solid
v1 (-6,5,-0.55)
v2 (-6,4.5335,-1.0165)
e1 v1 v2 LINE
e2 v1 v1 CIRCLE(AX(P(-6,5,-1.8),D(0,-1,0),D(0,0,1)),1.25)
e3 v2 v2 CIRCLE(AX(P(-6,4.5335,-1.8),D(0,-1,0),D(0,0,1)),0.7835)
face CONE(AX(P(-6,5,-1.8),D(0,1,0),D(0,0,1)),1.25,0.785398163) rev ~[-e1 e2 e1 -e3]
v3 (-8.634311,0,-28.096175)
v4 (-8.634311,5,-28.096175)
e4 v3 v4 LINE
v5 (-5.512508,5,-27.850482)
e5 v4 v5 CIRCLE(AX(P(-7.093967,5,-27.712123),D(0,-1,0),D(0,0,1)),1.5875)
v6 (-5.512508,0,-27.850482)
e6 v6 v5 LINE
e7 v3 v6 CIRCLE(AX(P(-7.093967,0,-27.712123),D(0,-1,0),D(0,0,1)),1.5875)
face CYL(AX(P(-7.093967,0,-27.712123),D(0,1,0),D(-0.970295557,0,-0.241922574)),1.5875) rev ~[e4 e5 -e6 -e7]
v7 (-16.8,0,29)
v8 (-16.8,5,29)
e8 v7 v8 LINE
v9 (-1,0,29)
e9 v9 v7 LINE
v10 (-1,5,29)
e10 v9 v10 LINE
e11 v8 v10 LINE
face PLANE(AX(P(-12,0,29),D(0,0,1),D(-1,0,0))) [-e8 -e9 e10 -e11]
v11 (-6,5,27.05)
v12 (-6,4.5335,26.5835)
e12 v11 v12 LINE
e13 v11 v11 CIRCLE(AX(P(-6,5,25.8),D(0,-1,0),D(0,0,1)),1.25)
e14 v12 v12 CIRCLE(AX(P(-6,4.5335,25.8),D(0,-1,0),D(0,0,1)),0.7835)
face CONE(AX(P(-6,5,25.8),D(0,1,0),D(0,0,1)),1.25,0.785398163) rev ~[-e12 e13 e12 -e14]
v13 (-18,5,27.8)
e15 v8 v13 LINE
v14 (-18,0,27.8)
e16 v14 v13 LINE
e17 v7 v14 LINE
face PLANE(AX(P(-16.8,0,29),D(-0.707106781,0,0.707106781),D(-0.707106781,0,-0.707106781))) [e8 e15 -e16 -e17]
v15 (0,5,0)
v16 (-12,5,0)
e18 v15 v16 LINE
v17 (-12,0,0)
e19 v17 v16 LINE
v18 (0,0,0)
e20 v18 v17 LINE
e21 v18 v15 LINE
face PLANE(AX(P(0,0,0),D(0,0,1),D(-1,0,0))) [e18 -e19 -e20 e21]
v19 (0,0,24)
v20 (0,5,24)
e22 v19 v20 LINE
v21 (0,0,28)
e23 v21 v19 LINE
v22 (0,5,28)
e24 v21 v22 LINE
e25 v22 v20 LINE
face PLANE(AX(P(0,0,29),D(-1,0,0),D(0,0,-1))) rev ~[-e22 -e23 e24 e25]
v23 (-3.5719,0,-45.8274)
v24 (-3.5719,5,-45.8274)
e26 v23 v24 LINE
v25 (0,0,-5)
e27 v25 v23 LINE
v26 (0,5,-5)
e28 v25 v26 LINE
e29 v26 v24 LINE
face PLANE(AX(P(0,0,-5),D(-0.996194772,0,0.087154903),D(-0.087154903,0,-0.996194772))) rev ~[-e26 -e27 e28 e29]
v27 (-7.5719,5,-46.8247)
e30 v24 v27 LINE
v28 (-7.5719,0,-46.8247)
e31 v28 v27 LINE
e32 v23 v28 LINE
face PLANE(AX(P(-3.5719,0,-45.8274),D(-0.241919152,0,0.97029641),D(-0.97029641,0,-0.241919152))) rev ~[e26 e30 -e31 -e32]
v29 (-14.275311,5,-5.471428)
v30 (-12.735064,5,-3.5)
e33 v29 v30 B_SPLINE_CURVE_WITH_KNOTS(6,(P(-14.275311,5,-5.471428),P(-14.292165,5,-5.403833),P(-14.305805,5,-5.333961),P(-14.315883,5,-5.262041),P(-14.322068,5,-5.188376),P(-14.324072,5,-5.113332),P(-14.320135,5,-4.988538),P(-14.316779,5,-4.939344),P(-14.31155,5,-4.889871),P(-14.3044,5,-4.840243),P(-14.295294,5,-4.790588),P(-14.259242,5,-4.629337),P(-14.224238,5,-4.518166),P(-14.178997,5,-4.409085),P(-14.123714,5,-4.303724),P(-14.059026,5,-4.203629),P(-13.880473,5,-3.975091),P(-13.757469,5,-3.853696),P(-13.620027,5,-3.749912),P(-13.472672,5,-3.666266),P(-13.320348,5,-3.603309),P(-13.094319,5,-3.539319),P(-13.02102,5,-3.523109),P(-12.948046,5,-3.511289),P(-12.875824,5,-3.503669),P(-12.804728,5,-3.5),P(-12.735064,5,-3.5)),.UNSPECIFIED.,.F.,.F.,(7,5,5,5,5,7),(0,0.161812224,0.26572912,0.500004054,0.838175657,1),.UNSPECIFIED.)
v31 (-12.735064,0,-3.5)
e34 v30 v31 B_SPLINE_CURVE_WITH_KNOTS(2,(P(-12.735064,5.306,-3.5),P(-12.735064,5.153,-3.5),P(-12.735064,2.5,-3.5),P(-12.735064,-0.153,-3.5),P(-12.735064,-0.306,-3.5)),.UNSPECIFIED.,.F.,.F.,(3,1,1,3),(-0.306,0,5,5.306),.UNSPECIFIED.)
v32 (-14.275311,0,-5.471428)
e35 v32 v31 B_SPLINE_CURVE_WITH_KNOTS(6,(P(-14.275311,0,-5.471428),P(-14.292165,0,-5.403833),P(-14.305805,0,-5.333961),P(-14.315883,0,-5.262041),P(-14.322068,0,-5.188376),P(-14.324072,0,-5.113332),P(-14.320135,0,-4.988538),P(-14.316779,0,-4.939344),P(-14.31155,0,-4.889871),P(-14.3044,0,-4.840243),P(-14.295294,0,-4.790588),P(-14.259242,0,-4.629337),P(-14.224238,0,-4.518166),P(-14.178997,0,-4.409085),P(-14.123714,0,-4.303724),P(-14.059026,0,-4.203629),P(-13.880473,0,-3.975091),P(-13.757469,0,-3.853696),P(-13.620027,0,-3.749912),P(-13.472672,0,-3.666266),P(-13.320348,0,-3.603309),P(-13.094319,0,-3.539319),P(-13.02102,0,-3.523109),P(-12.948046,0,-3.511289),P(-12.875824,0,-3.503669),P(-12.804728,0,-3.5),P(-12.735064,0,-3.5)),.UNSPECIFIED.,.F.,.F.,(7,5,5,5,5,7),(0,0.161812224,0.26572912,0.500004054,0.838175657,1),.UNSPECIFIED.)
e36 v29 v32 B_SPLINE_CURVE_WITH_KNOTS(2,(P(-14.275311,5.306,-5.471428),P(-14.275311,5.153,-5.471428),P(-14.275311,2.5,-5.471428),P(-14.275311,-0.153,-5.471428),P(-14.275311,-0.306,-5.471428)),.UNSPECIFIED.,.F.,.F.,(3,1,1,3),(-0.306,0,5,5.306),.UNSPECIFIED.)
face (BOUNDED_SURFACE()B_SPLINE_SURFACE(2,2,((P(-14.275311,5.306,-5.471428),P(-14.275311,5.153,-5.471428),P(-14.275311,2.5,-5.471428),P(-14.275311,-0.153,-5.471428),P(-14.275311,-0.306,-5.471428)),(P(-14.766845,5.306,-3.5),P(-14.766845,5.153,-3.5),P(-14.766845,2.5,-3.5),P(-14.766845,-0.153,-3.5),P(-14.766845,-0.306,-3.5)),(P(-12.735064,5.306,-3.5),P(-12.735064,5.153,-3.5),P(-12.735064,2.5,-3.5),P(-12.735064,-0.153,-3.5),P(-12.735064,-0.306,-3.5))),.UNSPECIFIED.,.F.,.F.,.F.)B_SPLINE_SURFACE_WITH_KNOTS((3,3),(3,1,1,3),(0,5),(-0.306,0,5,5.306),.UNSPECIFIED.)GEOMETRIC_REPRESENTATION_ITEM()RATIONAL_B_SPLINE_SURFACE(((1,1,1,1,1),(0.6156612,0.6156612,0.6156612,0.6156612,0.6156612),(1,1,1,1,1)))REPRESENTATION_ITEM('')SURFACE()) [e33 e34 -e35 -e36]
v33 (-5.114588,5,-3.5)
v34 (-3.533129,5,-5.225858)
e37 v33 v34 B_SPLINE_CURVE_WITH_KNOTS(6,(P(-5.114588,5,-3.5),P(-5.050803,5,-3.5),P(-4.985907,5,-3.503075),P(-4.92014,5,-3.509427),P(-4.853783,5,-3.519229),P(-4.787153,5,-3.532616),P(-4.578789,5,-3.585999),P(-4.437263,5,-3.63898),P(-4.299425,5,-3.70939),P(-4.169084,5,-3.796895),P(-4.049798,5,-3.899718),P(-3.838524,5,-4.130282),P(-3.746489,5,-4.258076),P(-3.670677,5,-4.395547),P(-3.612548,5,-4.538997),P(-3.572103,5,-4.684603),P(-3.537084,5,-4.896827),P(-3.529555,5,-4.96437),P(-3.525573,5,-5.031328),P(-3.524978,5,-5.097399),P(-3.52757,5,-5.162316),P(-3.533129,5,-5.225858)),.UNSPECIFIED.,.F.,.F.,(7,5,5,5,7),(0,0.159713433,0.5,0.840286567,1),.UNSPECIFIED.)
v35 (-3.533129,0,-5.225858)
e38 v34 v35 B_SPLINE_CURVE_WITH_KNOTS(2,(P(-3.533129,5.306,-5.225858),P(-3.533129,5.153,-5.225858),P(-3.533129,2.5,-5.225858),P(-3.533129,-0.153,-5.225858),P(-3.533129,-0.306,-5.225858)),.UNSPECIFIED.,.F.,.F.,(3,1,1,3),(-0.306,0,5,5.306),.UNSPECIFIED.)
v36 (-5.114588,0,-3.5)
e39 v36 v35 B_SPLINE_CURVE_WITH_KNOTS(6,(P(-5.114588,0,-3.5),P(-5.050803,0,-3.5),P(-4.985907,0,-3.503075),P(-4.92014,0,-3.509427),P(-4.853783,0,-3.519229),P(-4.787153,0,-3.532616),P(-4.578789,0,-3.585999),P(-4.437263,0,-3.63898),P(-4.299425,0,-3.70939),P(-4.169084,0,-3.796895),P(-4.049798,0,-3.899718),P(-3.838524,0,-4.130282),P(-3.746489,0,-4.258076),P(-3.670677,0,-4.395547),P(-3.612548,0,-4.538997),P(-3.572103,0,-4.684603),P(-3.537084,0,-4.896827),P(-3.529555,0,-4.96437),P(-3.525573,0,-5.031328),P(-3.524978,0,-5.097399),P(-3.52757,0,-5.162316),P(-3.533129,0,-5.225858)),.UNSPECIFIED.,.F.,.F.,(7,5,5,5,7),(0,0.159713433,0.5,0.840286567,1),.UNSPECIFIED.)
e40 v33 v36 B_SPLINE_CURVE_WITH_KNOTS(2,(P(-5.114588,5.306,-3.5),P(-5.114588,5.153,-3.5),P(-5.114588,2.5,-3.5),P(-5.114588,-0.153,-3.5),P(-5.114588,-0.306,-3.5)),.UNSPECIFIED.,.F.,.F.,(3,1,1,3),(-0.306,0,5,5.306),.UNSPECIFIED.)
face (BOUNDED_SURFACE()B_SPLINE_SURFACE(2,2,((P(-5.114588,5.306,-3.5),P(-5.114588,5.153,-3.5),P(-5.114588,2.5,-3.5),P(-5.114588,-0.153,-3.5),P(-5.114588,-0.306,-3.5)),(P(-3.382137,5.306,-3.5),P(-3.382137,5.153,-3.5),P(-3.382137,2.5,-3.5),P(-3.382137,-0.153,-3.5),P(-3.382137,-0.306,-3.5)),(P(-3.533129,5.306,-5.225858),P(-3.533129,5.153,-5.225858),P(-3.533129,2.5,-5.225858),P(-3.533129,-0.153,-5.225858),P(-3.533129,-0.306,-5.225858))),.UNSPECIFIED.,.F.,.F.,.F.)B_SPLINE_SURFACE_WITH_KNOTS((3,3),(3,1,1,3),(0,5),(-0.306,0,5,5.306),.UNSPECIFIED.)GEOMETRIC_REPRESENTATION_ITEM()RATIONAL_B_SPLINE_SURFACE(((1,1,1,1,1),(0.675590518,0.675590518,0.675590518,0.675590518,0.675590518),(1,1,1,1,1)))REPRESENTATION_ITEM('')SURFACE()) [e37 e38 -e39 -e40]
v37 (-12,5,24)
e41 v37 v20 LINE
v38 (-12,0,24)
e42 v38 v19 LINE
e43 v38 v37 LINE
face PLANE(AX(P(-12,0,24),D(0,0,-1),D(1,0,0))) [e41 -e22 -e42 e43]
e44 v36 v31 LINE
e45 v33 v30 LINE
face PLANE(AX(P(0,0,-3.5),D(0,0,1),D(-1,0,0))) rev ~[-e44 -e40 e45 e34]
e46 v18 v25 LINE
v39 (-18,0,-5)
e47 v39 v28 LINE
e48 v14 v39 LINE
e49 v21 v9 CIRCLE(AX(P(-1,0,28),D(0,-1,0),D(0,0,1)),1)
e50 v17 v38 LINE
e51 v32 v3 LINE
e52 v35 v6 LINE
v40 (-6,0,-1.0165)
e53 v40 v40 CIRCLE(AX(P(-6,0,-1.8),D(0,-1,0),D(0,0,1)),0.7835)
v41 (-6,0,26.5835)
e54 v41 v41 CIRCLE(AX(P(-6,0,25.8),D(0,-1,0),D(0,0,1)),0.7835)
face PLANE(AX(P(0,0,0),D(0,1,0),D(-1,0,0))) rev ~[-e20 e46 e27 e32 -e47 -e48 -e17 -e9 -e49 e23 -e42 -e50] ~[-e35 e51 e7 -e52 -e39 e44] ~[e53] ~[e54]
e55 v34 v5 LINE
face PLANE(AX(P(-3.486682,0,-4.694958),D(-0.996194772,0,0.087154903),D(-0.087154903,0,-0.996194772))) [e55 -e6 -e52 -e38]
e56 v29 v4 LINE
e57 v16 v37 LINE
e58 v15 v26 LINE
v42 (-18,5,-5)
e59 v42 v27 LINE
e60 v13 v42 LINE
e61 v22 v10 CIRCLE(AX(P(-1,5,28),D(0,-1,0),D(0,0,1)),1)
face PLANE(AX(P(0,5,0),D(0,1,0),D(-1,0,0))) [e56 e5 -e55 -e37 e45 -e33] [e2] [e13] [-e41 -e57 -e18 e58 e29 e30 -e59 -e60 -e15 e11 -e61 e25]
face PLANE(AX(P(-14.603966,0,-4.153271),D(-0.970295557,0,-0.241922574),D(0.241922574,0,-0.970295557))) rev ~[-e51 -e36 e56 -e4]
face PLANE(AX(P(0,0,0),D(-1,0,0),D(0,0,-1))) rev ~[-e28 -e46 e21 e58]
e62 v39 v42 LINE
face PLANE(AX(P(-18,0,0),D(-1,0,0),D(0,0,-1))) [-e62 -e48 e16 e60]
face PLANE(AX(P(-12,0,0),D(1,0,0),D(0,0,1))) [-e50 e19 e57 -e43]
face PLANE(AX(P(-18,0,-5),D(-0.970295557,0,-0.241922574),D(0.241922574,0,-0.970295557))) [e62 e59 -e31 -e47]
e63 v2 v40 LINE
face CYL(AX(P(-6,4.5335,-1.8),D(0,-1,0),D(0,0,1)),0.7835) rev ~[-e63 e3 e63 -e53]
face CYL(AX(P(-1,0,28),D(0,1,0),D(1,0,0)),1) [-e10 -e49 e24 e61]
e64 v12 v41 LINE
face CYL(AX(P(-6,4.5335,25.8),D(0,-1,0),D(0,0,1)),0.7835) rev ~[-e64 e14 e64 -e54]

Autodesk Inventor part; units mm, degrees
ref_plane "YZ Plane" through (0, 0, 0) normal (1, 0, 0) x (0, 1, 0)
ref_plane "XZ Plane" through (0, 0, 0) normal (0, 1, 0) x (-1, 0, 0)
ref_plane "XY Plane" through (0, 0, 0) normal (0, 0, 1) x (1, 0, 0)
sketch "Sketch1" plane through (0, 0, 0) normal (0, 1, 0) x (-1, 0, 0)
  line L0 (0, 0) -> (18, 0)
  line L1 (0, 0) -> (0, -5)
  line L2 (0, -5) -> (3.5719, -45.8274)
  line L3 (18, 0) -> (18, -5)
  line L4 (18, -5) -> (7.5719, -46.8247)
  line L5 (3.5719, -45.8274) -> (7.5719, -46.8247)
  dimension "d0" = 18
  dimension "d1" = 5
  dimension "d3" = 175
  dimension "d6" = 76
  dimension "d7" = 4
extrude "Extrusion1" add sketch "Sketch1" along normal blind 5
shell "Shell1" thickness 3.5 removed faces 2 at (-7.1906, 5, -18.6091) at (-7.1906, 0, -18.6091)
fillet "Fillet1" radius 1.5875 5 edges at (-3.5, 2.5, -4.8472) (-6.3393, 2.5, -37.3009) (-3.5, 2.5, -3.5) (-14.5, 2.5, -3.5) (-14.5, 2.5, -4.5703)
sketch "Sketch2" plane through (0, 0, 0) normal (0, -1, 0) x (1, 0, 0)
  line L0 (0, 0) -> (-12, 0)
  line L1 (-12, 0) -> (-12, 24)
  line L2 (-12, 24) -> (0, 24)
  line L3 (0, 24) -> (0, 0)
  line L4 (0, 24) -> (-12, 24)
  line L5 (-12, 24) -> (-12, 29)
  line L6 (-12, 29) -> (0, 29)
  line L7 (0, 29) -> (0, 24)
  line L8 (-12, 0) -> (-18, 0)
  line L9 (-18, 0) -> (-18, 24)
  line L10 (-18, 24) -> (-12, 24)
  line L11 (-12, 24) -> (-12, 0)
  line L12 (-18, 24) -> (-13.7574, 24) construction
  line L13 (-12, 29) -> (-16.8, 29)
  line L14 (-16.8, 29) -> (-18, 27.8)
  line L15 (-18, 27.8) -> (-18, 24)
  dimension "d14" = 24
  dimension "d15" = 5
  dimension "d16" = 12
  dimension "d18" = 6
  dimension "d57" = 1.2
  dimension "d58" = 135
extrude "Extrusion2" add sketch "Sketch2" against normal blind 5 contours L8 L9 L10 L1 | L2 L5 L6 L7 | L10 L15 L14 L13 L5
fillet "Fillet3" radius 1 1 edges at (0, 2.5, 29)
sketch "Sketch4" plane through (0, 5, 0) normal (0, 1, 0) x (1, 0, 0)
  line L0 (-12, -24) -> (-12, 0) projected
  line L1 (-12, -12) -> (-18, -12)
  line L2 (-18, 5) -> (-18, -29) projected
  line L3 (0, -24) -> (-12, -24) projected
  line L4 (-12, 0) -> (0, 0) projected
  circle A0 centre (-6, -25.8) radius 0.8
  circle A1 centre (-6, 1.8) radius 0.8
  line L5 (0, -28) -> (0, -24) projected
  point P0 (-18, 1.9304)
  point P1 (-18, -27.8)
  point P2 (-16.8, -29)
  dimension "d31" = 1.6
  dimension "d32" = 27.6
  dimension "d43" = 6
  dimension "d46" = 13.8
hole "Hole1" at (-6, 5, 25.8) at (-6, 5, -1.8) direction (0, -1, 0) diameter 1.567 depth 10 countersink diameter 2.5 countersink angle 90 thread size "M2x0.4" class "6H" standard "ISO Metric profile"
sketch "Sketch17" plane through (0, 5, 0) normal (0, 1, 0) x (1, 0, 0)
  line L0 (-15.0964, 25.5) -> (0.714, 25.5)
  line L1 (-12, 0) -> (0, 0) projected
  line L2 (-5.1146, 3.5) -> (-12.7349, 3.5) projected
  line L3 (0.714, 25.5) -> (-0.9097, 44.0597)
  line L4 (-15.0964, 25.5) -> (-10.3033, 44.7241)
  line L5 (0, 5) -> (-3.5719, 45.8274) projected
  line L6 (-7.5719, 46.8247) -> (-18, 5) projected
  line L7 (-4.6811, 48.4754) -> (-4.2422, 48.3659)
  line L8 (-3.5719, 45.8274) -> (-7.5719, 46.8247) projected
  arc A0 (-0.9097, 44.0597) -> (-4.6811, 48.4754) centre (-5.8907, 43.6239) ccw
  arc A1 (-4.2422, 48.3659) -> (-10.3033, 44.7241) centre (-5.4518, 43.5145) ccw
  point P0 (-8.9248, 3.5)
  point P1 (-4.4629, 48.4157)
  dimension "d152" = 22
  dimension "d153" = 2.498
  dimension "d154" = 2.142
  dimension "d155" = 2.301
  dimension "d156" = 5
extrude "Extrusion13" [suppressed]
sketch "Sketch18" plane through (-15.4653, 7.5, -25.5) normal (0, 0, 1) x (1, 0, 0)
  line L0 (16.1813, -10) -> (16.1813, 0) construction
  line L1 (4.8628, 0) -> (0, 0) construction
  line L2 (16.1813, -10) -> (0, 0) construction
  line L3 (0, -10) -> (0, 0) construction
  line L4 (16.1813, 0) -> (0, -10) construction
  line L5 (23.0907, 2.5) -> (-6.9093, 2.5)
  line L6 (-6.9093, 2.5) -> (-6.9093, -12.5)
  line L7 (-6.9093, -12.5) -> (23.0907, -12.5)
  line L8 (23.0907, -12.5) -> (23.0907, 2.5)
  line L9 (23.0907, 2.5) -> (-6.9093, -12.5) construction
  line L10 (-6.9093, 2.5) -> (23.0907, -12.5) construction
  point P0 (15.4653, -7.5)
  point P1 (8.0907, -5)
  dimension "d161" = 25
  dimension "d162" = 15
extrude "Extrusion14" [suppressed]
combine "Combine8" [suppressed]
extrude "Extrusion15" [suppressed]
combine "Combine9" [suppressed]
combine "Combine10" [suppressed]
sketch "Sketch20" plane through (-15.4653, 7.5, -21.5) normal (0, 0, 1) x (1, 0, 0)
  line L0 (10.1584, -7.5) -> (13.6718, -7.5) projected
  line L1 (6.1837, -2.5) -> (2.5765, -2.5) projected
  line L2 (11.871, -7.5) -> (3.871, -7.5)
  line L3 (3.871, -7.5) -> (3.871, -2.5)
  line L4 (3.871, -2.5) -> (11.871, -2.5)
  line L5 (11.871, -2.5) -> (11.871, -7.5)
  circle A0 centre (19.0907, -8.5) radius 1
  line L6 (23.0907, -12.5) -> (-6.9093, -12.5) construction
  circle A1 centre (-2.9093, -1.5) radius 1
  line L7 (23.0907, -12.5) -> (23.0907, 2.5) construction
  line L8 (23.0907, 2.5) -> (-6.9093, 2.5) construction
  line L9 (11.871, -7.5) -> (3.871, -7.5)
  line L10 (3.871, -7.5) -> (3.871, -10)
  line L11 (3.871, -10) -> (11.871, -10)
  line L12 (11.871, -10) -> (11.871, -7.5)
  line L13 (11.871, -2.5) -> (3.871, -2.5)
  line L14 (3.871, -2.5) -> (3.871, 0)
  line L15 (3.871, 0) -> (11.871, 0)
  line L16 (11.871, 0) -> (11.871, -2.5)
  line L17 (-6.9093, 2.5) -> (-6.9093, -12.5) projected
  point P0 (15.4653, -7.5)
  point P1 (23.0907, -5)
  point P2 (23.0907, -5)
  dimension "d167" = 9.224
  dimension "d168" = 3.5943
  dimension "d171" = 2
  dimension "d173" = 7.5
  dimension "d175" = 4.22
  dimension "d181" = 2.5
  dimension "d185" = 8
  dimension "d186" = 2.5
  dimension "d202" = 15
  dimension "d203" = 11
  dimension "d204" = 3.561
  dimension "d205" = 2
extrude "Extrusion16" [suppressed]
extrude "Extrusion17" [suppressed]
chamfer "Chamfer2" [suppressed]
chamfer "Chamfer3" [suppressed]
chamfer "Chamfer4" [suppressed]
chamfer "Chamfer5" [suppressed]
sketch "Sketch21" plane through (-15.4653, 7.5, -25.5) normal (0, 0, 1) x (1, 0, 0)
  line L0 (23.0907, 2.5) -> (-6.9093, 2.5) projected
  line L1 (-6.9093, 2.5) -> (-6.9093, -10.5) projected
  line L2 (23.0907, 2.5) -> (-6.9093, 2.5)
  line L3 (-6.9093, 2.5) -> (-6.9093, -5)
  line L4 (-6.9093, -5) -> (23.0907, -5)
  line L5 (23.0907, -5) -> (23.0907, 2.5)
  point P0 (15.4653, -7.5)
  dimension "d194" = 7.5
extrude "Extrusion18" [suppressed]
extrude "Extrusion19" [suppressed]
combine "Combine11" [suppressed]
sketch "Sketch22" plane through (-15.4653, 7.5, -25.5) normal (0, 0, 1) x (1, 0, 0)
  circle A0 centre (-2.9093, -1.5) radius 1 construction
  line L0 (-2.9093, -2.5) -> (-2.9093, -1.5) construction
  circle A1 centre (-2.9093, -1.5) radius 1
  point P0 (15.4653, -7.5)
extrude "Extrusion20" [suppressed]
chamfer "Chamfer7" [suppressed]
sketch "Sketch23" plane through (7.6254, 10, -60.5) normal (0, 0, -1) x (-1, 0, 0)
  line L0 (30, -7.5) -> (3.5, -7.5) projected
  line L1 (30, -7.5) -> (30, -11)
  line L2 (26.5, -7.5) -> (30, -11) projected
  line L3 (30, -11) -> (26.5, -7.5)
  line L4 (26.5, -7.5) -> (30, -7.5)
  line L5 (0, -4) -> (3.5, -7.5) projected
  line L6 (3.5, -7.5) -> (0, -7.5)
  line L7 (0, -7.5) -> (0, -4)
  line L8 (0, -4) -> (3.5, -7.5)
  point P0 (7.6254, -10)
extrude "Extrusion21" [suppressed]
extrude "Extrusion22" [suppressed]
combine "Combine12" [suppressed]
combine "Combine13" [suppressed]
fillet "Fillet6" [suppressed]
sketch "Sketch24" plane through (-22.3746, 10, -25.5) normal (0, 1, 0) x (1, 0, 0)
  circle A0 centre (24, 29) radius 1
  line L0 (30, 35) -> (0, 35) projected
  line L1 (30, 0) -> (30, 35) projected
  circle A1 centre (24, 11) radius 1
  circle A2 centre (6, 29) radius 1
  circle A3 centre (6, 11) radius 1
  point P0 (22.3746, -25.5)
  dimension "d216" = 2
  dimension "d217" = 4.064
  dimension "d218" = 4.147
  dimension "d221" = 18
  dimension "d224" = 20
extrude "Extrusion23" [suppressed]
extrude "Extrusion24" [suppressed]
chamfer "Chamfer8" [suppressed]
chamfer "Chamfer9" [suppressed]
properties part number "rapoukLegv9" material "EN AW-6060 T6"
